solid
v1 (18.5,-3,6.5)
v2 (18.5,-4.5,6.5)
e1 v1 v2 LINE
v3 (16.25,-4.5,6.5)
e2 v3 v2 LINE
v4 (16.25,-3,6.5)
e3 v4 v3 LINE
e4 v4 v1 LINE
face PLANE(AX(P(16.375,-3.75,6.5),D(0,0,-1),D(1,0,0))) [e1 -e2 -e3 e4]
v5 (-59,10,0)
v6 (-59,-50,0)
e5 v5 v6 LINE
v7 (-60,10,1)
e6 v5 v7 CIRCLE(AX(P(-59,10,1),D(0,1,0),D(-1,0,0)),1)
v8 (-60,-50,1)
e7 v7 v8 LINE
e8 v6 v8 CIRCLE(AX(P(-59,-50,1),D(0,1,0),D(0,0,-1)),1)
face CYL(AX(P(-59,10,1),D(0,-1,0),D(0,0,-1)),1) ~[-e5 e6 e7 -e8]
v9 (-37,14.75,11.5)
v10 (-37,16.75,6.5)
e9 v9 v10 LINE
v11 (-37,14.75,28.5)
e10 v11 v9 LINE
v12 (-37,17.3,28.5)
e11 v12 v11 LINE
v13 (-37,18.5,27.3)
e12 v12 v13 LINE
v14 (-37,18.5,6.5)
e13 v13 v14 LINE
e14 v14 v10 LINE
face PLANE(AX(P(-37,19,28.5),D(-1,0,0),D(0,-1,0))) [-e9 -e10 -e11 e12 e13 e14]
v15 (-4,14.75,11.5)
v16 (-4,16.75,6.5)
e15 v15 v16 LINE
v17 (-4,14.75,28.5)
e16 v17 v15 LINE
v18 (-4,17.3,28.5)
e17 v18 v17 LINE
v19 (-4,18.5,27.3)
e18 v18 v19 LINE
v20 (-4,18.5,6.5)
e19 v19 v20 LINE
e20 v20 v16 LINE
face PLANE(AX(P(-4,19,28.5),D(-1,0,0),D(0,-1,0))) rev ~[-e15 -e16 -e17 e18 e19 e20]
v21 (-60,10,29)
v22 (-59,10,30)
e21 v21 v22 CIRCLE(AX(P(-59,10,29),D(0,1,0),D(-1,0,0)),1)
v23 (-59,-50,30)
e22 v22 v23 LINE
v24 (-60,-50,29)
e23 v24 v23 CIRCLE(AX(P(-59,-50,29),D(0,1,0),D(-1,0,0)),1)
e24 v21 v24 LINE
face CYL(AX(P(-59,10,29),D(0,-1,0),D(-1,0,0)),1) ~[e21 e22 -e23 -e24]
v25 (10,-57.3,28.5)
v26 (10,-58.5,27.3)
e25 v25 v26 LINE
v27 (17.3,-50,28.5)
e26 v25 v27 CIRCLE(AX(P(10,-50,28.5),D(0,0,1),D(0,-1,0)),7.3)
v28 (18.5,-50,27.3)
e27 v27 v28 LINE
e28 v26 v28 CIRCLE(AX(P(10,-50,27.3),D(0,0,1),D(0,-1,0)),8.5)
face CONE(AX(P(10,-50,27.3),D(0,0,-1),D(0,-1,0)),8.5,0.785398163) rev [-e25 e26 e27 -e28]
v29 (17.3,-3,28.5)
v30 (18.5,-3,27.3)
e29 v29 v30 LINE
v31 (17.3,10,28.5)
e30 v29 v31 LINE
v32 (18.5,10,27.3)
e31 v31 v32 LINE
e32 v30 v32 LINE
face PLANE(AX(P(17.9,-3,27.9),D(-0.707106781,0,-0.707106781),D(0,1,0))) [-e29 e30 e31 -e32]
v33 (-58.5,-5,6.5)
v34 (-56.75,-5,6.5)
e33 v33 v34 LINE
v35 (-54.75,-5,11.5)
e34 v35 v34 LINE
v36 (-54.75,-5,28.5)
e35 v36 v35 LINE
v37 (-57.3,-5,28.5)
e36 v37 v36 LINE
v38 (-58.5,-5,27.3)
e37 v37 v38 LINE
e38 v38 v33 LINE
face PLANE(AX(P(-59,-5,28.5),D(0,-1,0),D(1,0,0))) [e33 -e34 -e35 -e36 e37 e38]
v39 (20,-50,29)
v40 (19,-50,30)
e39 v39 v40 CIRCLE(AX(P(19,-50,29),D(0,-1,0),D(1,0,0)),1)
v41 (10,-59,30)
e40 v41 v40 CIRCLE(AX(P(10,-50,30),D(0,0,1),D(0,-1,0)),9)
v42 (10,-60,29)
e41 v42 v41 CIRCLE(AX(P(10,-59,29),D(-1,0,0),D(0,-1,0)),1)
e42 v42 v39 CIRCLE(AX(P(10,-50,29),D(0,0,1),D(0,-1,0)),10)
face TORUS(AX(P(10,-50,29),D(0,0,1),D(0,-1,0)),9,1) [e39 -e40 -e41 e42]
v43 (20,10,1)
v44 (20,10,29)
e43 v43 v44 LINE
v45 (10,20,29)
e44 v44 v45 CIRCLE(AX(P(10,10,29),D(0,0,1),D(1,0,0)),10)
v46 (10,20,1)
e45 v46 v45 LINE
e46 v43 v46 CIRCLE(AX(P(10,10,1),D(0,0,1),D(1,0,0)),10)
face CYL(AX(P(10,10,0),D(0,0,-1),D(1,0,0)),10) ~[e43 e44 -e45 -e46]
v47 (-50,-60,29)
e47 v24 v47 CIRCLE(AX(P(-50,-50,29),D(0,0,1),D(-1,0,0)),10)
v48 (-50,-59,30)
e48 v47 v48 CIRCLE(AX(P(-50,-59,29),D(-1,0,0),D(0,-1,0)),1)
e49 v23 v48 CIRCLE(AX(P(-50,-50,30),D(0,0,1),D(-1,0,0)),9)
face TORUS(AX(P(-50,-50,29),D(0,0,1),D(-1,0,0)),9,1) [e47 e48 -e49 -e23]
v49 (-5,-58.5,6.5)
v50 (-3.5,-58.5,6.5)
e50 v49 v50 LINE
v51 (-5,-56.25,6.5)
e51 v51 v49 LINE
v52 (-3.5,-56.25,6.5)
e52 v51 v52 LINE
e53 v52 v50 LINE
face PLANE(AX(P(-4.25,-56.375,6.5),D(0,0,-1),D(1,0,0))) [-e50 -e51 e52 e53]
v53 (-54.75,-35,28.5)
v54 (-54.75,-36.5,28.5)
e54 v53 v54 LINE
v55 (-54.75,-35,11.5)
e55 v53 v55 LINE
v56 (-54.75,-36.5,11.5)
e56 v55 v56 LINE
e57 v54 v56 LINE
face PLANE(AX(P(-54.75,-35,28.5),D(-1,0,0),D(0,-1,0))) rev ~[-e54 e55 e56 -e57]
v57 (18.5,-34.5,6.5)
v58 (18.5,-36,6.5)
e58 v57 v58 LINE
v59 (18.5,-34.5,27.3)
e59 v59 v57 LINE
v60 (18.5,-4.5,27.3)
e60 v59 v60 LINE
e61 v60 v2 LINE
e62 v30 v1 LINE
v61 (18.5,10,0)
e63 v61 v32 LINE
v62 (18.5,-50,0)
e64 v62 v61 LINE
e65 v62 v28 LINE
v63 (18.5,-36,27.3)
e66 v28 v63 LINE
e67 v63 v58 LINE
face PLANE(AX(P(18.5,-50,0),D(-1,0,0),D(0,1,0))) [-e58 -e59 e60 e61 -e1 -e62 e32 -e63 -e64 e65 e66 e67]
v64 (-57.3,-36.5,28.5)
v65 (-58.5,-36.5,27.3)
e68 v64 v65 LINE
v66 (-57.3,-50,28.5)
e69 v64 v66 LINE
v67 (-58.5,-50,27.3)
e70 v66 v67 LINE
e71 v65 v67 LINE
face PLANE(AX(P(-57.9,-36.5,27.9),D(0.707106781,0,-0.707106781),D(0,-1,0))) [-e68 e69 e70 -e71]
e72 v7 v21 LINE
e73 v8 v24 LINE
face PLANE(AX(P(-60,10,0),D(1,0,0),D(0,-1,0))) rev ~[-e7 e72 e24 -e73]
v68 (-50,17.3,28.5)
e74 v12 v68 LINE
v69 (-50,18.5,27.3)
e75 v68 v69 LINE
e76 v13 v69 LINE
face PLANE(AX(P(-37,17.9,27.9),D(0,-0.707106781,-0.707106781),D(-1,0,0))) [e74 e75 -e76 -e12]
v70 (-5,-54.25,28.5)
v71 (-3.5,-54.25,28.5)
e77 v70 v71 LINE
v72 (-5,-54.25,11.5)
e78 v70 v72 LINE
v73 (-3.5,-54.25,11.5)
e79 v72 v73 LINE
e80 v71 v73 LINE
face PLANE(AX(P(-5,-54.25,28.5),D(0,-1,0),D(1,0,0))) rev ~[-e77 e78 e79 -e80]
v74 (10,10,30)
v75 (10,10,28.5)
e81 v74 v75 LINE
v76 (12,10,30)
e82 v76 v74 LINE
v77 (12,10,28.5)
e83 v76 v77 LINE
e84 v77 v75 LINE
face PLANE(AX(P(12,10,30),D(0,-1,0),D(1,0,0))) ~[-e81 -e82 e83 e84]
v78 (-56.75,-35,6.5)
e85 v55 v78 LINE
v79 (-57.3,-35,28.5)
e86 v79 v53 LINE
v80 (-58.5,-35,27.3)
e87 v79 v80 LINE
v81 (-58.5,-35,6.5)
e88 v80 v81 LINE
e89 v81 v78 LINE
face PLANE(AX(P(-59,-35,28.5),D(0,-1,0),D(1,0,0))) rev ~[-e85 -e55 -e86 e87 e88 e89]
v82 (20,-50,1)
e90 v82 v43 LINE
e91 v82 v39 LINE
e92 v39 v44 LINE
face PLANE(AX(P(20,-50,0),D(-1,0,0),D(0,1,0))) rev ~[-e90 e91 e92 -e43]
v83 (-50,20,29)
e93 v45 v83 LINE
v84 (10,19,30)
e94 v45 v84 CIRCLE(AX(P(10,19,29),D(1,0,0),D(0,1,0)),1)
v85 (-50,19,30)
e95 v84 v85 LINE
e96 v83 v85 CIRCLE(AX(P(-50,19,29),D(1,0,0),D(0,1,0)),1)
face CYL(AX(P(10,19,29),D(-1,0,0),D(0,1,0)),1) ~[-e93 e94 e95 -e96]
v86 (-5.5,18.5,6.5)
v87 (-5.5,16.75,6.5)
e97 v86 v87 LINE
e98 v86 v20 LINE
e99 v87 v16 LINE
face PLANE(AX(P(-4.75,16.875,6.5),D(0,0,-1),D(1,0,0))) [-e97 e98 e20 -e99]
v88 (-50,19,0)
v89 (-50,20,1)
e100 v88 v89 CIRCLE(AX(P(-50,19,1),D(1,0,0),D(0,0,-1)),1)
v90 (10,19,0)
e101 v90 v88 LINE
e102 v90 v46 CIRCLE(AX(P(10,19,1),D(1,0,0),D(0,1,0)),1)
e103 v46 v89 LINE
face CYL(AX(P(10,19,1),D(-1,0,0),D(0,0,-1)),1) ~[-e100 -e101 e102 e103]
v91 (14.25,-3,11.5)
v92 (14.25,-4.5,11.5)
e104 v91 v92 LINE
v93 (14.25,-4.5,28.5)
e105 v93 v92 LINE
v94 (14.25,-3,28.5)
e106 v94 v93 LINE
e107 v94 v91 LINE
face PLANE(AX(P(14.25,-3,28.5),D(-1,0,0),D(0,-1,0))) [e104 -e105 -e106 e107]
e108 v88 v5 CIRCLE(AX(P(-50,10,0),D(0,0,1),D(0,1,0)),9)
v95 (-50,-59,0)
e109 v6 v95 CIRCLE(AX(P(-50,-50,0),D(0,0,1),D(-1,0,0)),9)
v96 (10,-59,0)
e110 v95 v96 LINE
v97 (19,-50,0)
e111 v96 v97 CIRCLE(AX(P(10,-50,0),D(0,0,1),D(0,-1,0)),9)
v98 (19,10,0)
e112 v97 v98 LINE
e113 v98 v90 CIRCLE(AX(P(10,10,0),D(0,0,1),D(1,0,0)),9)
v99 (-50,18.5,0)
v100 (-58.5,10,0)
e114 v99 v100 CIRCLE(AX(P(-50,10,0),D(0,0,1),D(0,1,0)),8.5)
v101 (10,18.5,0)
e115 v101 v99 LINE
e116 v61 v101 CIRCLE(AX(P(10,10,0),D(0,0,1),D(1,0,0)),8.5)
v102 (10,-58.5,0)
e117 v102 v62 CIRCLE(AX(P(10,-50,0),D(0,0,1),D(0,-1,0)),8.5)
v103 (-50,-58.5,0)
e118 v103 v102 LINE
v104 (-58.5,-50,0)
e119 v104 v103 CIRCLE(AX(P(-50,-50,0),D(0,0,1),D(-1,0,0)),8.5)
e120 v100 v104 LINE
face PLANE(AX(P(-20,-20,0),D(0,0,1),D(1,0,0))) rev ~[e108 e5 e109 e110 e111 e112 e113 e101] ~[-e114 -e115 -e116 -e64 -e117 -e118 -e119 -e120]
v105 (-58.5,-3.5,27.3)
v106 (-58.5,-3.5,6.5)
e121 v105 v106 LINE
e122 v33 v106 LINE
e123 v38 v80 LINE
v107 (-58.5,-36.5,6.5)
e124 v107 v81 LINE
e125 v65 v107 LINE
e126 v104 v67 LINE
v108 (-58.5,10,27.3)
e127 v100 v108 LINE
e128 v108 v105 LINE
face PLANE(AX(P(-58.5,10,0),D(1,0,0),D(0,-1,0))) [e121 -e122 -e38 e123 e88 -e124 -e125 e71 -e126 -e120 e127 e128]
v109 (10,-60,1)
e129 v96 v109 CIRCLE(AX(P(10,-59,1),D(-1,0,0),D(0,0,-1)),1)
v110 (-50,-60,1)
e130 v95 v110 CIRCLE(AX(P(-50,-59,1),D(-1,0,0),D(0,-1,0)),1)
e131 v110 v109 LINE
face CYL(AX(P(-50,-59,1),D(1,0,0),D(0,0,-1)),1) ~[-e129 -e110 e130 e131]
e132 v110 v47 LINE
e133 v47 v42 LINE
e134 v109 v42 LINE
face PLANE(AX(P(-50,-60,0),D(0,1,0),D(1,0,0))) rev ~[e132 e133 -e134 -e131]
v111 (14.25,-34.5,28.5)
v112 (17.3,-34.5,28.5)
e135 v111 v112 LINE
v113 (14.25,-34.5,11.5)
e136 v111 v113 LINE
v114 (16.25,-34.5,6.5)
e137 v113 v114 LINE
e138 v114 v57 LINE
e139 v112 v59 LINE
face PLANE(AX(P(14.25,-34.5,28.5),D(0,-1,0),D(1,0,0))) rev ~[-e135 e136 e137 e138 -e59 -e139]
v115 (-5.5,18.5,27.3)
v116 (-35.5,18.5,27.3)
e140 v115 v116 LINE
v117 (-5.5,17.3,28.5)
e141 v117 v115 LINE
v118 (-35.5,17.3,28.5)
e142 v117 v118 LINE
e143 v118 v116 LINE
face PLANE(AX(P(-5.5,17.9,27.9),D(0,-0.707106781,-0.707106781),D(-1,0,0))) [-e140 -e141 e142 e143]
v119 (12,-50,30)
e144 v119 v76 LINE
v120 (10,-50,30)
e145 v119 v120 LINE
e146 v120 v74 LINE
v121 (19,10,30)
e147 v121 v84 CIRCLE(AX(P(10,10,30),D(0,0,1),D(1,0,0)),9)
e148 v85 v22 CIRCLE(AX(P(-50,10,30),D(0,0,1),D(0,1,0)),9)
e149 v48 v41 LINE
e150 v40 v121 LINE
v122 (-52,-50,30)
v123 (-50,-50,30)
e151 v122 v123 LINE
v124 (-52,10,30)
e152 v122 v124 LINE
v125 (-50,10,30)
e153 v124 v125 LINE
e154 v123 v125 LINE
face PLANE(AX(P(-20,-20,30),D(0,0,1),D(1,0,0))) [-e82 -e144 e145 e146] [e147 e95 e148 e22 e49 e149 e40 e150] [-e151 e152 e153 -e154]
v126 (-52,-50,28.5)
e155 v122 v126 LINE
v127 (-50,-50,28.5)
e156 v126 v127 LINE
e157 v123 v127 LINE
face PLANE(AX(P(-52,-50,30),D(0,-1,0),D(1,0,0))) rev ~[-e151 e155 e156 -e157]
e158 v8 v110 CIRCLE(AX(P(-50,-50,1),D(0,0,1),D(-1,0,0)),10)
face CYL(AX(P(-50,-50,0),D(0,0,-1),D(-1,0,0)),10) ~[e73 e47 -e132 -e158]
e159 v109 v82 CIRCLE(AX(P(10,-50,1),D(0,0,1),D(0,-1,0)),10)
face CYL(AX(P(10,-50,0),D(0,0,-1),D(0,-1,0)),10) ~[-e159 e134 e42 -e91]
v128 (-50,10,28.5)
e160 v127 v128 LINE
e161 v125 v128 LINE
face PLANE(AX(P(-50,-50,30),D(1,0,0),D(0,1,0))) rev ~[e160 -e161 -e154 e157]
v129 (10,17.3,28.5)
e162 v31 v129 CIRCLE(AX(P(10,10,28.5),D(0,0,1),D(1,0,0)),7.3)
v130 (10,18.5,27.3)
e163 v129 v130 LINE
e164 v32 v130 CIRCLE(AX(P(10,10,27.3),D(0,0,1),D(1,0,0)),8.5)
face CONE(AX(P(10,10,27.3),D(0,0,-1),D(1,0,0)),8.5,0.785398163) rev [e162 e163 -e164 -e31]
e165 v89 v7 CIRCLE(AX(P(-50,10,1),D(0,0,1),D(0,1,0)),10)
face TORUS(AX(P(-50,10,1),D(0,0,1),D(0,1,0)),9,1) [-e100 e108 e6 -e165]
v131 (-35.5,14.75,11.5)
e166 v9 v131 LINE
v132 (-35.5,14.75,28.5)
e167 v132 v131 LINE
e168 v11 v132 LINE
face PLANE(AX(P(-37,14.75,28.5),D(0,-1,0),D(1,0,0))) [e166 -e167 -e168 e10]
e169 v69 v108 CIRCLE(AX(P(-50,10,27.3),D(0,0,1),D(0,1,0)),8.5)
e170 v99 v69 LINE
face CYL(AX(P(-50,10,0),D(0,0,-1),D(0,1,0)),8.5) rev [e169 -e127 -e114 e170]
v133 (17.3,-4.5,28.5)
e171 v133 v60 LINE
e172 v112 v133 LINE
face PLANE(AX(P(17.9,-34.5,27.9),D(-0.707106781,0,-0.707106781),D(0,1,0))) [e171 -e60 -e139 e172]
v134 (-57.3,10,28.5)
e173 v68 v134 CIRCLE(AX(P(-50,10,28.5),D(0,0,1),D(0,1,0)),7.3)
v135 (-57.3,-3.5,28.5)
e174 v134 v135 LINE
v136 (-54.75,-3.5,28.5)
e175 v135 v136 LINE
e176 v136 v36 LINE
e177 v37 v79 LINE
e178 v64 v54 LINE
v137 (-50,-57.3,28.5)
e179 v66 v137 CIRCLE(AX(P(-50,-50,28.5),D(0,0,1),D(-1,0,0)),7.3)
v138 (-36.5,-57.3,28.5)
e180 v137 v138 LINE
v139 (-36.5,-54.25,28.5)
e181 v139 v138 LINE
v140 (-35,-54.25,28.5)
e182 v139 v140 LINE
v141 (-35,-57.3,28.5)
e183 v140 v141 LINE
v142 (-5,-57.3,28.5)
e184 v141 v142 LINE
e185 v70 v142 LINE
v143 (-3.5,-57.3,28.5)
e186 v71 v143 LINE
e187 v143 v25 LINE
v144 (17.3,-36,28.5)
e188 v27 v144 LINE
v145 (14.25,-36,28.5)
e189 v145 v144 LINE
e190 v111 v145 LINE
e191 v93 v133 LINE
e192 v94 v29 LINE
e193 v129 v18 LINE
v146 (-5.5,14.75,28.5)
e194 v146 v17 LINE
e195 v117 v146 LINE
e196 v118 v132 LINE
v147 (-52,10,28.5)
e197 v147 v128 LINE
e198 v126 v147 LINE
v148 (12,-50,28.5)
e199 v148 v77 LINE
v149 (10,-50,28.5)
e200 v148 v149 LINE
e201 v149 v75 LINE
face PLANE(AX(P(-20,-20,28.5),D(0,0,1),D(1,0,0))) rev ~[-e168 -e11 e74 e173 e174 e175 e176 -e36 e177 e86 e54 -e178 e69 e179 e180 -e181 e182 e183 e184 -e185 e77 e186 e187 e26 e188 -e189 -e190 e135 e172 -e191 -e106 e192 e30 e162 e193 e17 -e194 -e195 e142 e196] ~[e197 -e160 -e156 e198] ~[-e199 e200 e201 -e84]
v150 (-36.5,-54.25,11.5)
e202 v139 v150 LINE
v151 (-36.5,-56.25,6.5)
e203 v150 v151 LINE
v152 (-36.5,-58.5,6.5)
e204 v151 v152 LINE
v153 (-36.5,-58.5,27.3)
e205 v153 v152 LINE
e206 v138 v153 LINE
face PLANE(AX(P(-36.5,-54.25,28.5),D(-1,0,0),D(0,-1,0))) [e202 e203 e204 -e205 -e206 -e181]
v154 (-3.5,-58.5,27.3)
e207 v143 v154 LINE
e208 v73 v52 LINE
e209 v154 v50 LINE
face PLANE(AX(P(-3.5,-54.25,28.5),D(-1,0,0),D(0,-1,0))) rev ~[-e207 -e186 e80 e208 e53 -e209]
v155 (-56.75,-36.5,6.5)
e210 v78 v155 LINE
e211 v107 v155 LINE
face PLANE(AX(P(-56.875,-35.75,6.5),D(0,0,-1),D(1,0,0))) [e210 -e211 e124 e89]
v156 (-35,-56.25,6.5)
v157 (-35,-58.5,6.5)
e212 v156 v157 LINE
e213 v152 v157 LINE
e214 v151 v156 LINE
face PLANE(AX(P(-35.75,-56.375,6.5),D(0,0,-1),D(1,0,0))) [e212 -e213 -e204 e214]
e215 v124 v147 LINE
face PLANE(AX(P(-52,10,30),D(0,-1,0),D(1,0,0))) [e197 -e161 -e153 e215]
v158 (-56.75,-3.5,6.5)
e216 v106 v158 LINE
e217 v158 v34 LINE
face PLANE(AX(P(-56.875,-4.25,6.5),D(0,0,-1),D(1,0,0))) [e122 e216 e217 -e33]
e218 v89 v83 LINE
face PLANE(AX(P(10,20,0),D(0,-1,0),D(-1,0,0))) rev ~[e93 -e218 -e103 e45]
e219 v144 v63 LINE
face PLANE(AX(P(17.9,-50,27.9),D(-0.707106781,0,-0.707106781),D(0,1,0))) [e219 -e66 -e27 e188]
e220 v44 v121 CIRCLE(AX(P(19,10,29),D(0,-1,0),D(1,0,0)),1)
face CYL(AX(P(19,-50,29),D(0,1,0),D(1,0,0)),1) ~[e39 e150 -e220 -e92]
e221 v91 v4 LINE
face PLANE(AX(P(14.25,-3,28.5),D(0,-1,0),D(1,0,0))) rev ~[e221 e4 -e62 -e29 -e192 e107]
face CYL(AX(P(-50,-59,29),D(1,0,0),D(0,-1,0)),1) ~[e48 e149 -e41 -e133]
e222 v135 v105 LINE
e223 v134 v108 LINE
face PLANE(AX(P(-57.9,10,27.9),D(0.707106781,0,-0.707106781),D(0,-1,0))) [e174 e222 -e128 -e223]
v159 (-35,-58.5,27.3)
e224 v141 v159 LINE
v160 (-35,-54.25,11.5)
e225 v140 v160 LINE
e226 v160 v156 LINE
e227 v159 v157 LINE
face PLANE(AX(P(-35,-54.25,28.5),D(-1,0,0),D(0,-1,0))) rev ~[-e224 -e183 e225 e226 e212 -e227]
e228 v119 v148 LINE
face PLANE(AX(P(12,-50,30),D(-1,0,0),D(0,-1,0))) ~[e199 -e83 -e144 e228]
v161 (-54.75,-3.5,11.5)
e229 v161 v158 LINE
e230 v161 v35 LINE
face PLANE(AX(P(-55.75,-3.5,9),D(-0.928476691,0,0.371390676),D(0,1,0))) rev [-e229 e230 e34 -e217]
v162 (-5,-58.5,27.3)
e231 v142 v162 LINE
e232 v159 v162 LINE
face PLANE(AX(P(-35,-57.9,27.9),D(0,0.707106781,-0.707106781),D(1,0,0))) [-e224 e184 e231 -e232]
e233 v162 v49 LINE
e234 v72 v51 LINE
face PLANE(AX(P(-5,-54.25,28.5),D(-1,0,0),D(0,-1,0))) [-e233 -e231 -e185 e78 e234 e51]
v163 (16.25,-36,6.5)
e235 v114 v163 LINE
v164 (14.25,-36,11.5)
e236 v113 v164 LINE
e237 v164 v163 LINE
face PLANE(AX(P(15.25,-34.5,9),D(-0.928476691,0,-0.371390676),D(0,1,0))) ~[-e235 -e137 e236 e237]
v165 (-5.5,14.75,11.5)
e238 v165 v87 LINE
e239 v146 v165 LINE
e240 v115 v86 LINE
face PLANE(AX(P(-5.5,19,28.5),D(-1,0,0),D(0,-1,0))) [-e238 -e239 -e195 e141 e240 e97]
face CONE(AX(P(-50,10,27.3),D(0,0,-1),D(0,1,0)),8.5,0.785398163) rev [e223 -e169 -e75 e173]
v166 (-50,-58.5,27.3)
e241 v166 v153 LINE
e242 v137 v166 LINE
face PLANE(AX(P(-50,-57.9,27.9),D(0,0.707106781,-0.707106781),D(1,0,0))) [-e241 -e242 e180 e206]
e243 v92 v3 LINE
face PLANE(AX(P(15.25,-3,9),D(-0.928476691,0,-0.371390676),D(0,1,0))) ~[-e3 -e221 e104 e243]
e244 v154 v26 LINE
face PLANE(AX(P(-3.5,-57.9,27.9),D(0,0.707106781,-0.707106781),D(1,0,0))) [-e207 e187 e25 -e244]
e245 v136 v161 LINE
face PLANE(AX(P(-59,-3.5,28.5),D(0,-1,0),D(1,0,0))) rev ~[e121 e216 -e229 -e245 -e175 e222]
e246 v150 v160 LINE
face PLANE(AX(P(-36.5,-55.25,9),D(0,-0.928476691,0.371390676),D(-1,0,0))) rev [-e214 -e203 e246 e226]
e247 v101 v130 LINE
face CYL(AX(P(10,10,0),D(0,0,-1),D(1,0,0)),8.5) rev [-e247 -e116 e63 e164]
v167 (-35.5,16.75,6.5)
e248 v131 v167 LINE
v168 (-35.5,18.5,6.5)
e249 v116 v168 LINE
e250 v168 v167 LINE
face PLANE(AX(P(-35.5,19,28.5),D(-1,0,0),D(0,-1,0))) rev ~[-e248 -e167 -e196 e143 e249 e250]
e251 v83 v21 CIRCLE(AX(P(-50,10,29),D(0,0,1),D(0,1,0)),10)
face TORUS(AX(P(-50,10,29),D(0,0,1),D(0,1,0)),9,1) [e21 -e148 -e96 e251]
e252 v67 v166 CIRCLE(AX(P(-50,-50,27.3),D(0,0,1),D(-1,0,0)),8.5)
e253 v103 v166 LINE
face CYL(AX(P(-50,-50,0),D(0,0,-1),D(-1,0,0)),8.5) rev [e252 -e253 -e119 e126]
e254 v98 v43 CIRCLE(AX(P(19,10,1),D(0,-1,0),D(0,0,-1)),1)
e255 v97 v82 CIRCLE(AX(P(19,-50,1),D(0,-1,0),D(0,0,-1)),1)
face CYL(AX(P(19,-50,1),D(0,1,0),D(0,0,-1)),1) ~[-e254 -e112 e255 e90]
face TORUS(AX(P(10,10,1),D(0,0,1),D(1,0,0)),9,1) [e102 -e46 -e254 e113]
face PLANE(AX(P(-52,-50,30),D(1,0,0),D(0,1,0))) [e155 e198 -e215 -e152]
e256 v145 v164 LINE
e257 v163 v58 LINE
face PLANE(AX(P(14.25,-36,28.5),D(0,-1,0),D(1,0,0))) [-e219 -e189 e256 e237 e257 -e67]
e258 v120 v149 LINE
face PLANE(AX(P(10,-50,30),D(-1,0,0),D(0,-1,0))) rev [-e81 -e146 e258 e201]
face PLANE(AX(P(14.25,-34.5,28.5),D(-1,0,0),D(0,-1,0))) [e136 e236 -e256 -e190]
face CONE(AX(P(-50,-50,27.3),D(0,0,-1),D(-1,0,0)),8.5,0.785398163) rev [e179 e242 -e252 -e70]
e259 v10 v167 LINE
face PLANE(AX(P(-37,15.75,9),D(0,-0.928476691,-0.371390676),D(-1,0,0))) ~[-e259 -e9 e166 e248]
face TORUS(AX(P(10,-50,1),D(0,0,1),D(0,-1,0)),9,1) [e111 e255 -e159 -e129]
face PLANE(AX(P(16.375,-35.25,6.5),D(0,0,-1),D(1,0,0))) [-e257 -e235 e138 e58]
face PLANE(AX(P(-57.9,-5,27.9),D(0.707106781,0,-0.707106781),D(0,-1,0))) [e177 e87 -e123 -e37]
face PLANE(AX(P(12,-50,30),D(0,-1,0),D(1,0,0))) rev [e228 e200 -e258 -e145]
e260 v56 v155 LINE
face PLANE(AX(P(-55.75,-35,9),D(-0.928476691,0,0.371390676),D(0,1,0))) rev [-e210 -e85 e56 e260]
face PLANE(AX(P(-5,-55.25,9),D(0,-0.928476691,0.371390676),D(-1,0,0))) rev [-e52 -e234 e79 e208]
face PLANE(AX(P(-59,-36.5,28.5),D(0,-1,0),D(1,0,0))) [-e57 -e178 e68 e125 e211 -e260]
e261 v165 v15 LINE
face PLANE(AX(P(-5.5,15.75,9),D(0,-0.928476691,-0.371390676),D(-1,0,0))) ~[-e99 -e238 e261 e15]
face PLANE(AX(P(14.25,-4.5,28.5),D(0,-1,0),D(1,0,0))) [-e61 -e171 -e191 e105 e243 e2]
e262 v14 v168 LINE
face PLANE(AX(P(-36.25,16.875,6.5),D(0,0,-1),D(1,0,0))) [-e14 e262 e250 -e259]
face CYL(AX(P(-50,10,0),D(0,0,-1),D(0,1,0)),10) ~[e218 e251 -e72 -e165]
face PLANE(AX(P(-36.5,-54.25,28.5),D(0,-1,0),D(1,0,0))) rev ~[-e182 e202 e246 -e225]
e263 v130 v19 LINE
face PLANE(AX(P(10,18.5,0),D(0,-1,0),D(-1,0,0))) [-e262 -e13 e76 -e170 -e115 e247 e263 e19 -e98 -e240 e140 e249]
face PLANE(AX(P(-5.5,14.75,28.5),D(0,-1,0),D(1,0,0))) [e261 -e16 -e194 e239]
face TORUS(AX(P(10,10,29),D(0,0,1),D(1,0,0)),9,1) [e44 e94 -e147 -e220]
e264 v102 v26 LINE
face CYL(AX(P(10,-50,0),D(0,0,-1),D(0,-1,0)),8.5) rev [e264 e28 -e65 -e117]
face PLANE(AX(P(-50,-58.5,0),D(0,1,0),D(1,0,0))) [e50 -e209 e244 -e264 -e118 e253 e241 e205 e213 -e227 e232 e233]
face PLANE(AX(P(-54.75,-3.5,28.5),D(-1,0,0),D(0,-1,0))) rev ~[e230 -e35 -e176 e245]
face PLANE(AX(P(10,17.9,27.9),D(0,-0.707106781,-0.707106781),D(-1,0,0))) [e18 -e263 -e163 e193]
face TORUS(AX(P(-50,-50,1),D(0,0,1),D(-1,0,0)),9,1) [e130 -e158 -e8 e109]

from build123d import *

# Parameters (mm, degrees)
F1_DEPTH    = 30
F2_T        = -1.5
F3_W        = 1.5
F3_H        = 4.25
F3_W_2      = 4.25
F3_H_2      = 1.5
F4_DEPTH    = 22
F5_SIZE     = 1.2
F6_R        = 1
F7_W        = 2
F7_H        = 60
F8_DEPTH    = 30.001
F10_SIZE2   = 2
F10_SIZE    = 5
F10_2_SIZE2 = 2
F10_2_SIZE  = 5
F10_3_SIZE2 = 2
F10_3_SIZE  = 5
F10_4_SIZE2 = 2
F10_4_SIZE  = 5
F10_5_SIZE2 = 2
F10_5_SIZE  = 5
F10_6_SIZE2 = 2
F10_6_SIZE  = 5
F10_7_SIZE2 = 2
F10_7_SIZE  = 5
F10_8_SIZE2 = 2
F10_8_SIZE  = 5


# Not quite as in the source:
# - a pattern or mirror of a feature is missing from the dataset's text; its kind, count and spacing are read off the source's solid


with BuildPart() as f1:
    # F0 (on Top) → F1 (new body)
    with BuildSketch(Plane.XY):
        with BuildLine():
            ThreePointArc((20, 10), (17.0710678119, 17.0710678119), (10, 20))
            Line((10, 20), (-50, 20))
            ThreePointArc((-50, 20), (-57.0710678119, 17.0710678119), (-60, 10))
            Line((-60, 10), (-60, -50))
            ThreePointArc((-60, -50), (-57.0710678119, -57.0710678119), (-50, -60))
            Line((-50, -60), (10, -60))
            ThreePointArc((10, -60), (17.0710678119, -57.0710678119), (20, -50))
            Line((20, -50), (20, 10))
        make_face()
    extrude(amount=F1_DEPTH)

    # F2
    f2_openings = [f1.faces().sort_by_distance(p)[0] for p in [
        (-20, -20, 0),
    ]]
    offset(amount=F2_T, openings=f2_openings)

    # F3 (on face) → F4 (join)
    with BuildSketch(Plane(origin=(0, 0, 28.5), x_dir=(1, 0, 0), z_dir=(0, 0, -1))):
        with Locations((-35.75, 56.375)):
            Rectangle(F3_W, F3_H)
        with Locations((-4.25, 56.375)):
            Rectangle(F3_W, F3_H)
        with Locations((-56.875, 4.25)):
            Rectangle(F3_W_2, F3_H_2)
        with Locations((-56.875, 35.75)):
            Rectangle(F3_W_2, F3_H_2)
        with Locations((-4.75, -16.875)):
            Rectangle(F3_W, F3_H)
        with Locations((-36.25, -16.875)):
            Rectangle(F3_W, F3_H)
        with Locations((16.375, 35.25)):
            Rectangle(F3_W_2, F3_H_2)
        with Locations((16.375, 3.75)):
            Rectangle(F3_W_2, F3_H_2)
    extrude(amount=F4_DEPTH)

    # F5
    f5_edges = [f1.edges().sort_by_distance(p)[0] for p in [
        (3, 18.5, 28.5),
        (-20.5, 18.5, 28.5),
        (-43.5, 18.5, 28.5),
        (18.5, -19.5, 28.5),
        (18.5, -43, 28.5),
        (-58.5, -20, 28.5),
        (-58.5, -43.25, 28.5),
        (-20, -58.5, 28.5),
        (16.010408, 16.010408, 28.5),
        (18.5, 3.5, 28.5),
        (16.010408, -56.010408, 28.5),
        (3.25, -58.5, 28.5),
        (-43.25, -58.5, 28.5),
        (-56.010408, -56.010408, 28.5),
        (-58.5, 3.25, 28.5),
        (-56.010408, 16.010408, 28.5),
    ]]
    chamfer(f5_edges, length=F5_SIZE)

    # F6
    f6_edges = [f1.edges().sort_by_distance(p)[0] for p in [
        (20, -20, 30),
        (20, -20, 0),
        (17.071068, 17.071068, 0),
        (-20, 20, 0),
        (-57.071068, 17.071068, 0),
        (-60, -20, 0),
        (-57.071068, -57.071068, 0),
        (-20, -60, 0),
        (17.071068, -57.071068, 0),
        (17.071068, 17.071068, 30),
        (-20, 20, 30),
        (-57.071068, 17.071068, 30),
        (-60, -20, 30),
        (-57.071068, -57.071068, 30),
        (-20, -60, 30),
        (17.071068, -57.071068, 30),
    ]]
    fillet(f6_edges, radius=F6_R)

    # F7 (on face) → F8 (cut, through all)
    with BuildSketch(Plane.XY.offset(30)):
        with Locations((-51, -20)):
            Rectangle(F7_W, F7_H)
    f8 = extrude(amount=-F8_DEPTH, mode=Mode.SUBTRACT)

    # F8_copies: F8 across plane
    add(f8.mirror(Plane(origin=(-20, 0, 0), x_dir=(0, 0, 1), z_dir=(1, 0, 0))), mode=Mode.SUBTRACT)

    # F10
    f10_edges = [f1.edges().sort_by_distance(p)[0] for p in [
        (-54.75, -4.25, 6.5),
    ]]
    f10_side = f1.faces().sort_by_distance((-54.75, -4.25, 17.5))[0]
    chamfer(f10_edges, length=F10_SIZE, length2=F10_SIZE2, reference=f10_side)

    # F10#2
    f10_2_edges = [f1.edges().sort_by_distance(p)[0] for p in [
        (-54.75, -35.75, 6.5),
    ]]
    f10_2_side = f1.faces().sort_by_distance((-54.75, -35.75, 17.5))[0]
    chamfer(f10_2_edges, length=F10_2_SIZE, length2=F10_2_SIZE2, reference=f10_2_side)

    # F10#3
    f10_3_edges = [f1.edges().sort_by_distance(p)[0] for p in [
        (-35.75, -54.25, 6.5),
    ]]
    f10_3_side = f1.faces().sort_by_distance((-35.75, -54.25, 17.5))[0]
    chamfer(f10_3_edges, length=F10_3_SIZE, length2=F10_3_SIZE2, reference=f10_3_side)

    # F10#4
    f10_4_edges = [f1.edges().sort_by_distance(p)[0] for p in [
        (-4.25, -54.25, 6.5),
    ]]
    f10_4_side = f1.faces().sort_by_distance((-4.25, -54.25, 17.5))[0]
    chamfer(f10_4_edges, length=F10_4_SIZE, length2=F10_4_SIZE2, reference=f10_4_side)

    # F10#5
    f10_5_edges = [f1.edges().sort_by_distance(p)[0] for p in [
        (14.25, -35.25, 6.5),
    ]]
    f10_5_side = f1.faces().sort_by_distance((14.25, -35.25, 17.5))[0]
    chamfer(f10_5_edges, length=F10_5_SIZE, length2=F10_5_SIZE2, reference=f10_5_side)

    # F10#6
    f10_6_edges = [f1.edges().sort_by_distance(p)[0] for p in [
        (14.25, -3.75, 6.5),
    ]]
    f10_6_side = f1.faces().sort_by_distance((14.25, -3.75, 17.5))[0]
    chamfer(f10_6_edges, length=F10_6_SIZE, length2=F10_6_SIZE2, reference=f10_6_side)

    # F10#7
    f10_7_edges = [f1.edges().sort_by_distance(p)[0] for p in [
        (-4.75, 14.75, 6.5),
    ]]
    f10_7_side = f1.faces().sort_by_distance((-4.75, 14.75, 17.5))[0]
    chamfer(f10_7_edges, length=F10_7_SIZE, length2=F10_7_SIZE2, reference=f10_7_side)

    # F10#8
    f10_8_edges = [f1.edges().sort_by_distance(p)[0] for p in [
        (-36.25, 14.75, 6.5),
    ]]
    f10_8_side = f1.faces().sort_by_distance((-36.25, 14.75, 17.5))[0]
    chamfer(f10_8_edges, length=F10_8_SIZE, length2=F10_8_SIZE2, reference=f10_8_side)


solid = f1.part
